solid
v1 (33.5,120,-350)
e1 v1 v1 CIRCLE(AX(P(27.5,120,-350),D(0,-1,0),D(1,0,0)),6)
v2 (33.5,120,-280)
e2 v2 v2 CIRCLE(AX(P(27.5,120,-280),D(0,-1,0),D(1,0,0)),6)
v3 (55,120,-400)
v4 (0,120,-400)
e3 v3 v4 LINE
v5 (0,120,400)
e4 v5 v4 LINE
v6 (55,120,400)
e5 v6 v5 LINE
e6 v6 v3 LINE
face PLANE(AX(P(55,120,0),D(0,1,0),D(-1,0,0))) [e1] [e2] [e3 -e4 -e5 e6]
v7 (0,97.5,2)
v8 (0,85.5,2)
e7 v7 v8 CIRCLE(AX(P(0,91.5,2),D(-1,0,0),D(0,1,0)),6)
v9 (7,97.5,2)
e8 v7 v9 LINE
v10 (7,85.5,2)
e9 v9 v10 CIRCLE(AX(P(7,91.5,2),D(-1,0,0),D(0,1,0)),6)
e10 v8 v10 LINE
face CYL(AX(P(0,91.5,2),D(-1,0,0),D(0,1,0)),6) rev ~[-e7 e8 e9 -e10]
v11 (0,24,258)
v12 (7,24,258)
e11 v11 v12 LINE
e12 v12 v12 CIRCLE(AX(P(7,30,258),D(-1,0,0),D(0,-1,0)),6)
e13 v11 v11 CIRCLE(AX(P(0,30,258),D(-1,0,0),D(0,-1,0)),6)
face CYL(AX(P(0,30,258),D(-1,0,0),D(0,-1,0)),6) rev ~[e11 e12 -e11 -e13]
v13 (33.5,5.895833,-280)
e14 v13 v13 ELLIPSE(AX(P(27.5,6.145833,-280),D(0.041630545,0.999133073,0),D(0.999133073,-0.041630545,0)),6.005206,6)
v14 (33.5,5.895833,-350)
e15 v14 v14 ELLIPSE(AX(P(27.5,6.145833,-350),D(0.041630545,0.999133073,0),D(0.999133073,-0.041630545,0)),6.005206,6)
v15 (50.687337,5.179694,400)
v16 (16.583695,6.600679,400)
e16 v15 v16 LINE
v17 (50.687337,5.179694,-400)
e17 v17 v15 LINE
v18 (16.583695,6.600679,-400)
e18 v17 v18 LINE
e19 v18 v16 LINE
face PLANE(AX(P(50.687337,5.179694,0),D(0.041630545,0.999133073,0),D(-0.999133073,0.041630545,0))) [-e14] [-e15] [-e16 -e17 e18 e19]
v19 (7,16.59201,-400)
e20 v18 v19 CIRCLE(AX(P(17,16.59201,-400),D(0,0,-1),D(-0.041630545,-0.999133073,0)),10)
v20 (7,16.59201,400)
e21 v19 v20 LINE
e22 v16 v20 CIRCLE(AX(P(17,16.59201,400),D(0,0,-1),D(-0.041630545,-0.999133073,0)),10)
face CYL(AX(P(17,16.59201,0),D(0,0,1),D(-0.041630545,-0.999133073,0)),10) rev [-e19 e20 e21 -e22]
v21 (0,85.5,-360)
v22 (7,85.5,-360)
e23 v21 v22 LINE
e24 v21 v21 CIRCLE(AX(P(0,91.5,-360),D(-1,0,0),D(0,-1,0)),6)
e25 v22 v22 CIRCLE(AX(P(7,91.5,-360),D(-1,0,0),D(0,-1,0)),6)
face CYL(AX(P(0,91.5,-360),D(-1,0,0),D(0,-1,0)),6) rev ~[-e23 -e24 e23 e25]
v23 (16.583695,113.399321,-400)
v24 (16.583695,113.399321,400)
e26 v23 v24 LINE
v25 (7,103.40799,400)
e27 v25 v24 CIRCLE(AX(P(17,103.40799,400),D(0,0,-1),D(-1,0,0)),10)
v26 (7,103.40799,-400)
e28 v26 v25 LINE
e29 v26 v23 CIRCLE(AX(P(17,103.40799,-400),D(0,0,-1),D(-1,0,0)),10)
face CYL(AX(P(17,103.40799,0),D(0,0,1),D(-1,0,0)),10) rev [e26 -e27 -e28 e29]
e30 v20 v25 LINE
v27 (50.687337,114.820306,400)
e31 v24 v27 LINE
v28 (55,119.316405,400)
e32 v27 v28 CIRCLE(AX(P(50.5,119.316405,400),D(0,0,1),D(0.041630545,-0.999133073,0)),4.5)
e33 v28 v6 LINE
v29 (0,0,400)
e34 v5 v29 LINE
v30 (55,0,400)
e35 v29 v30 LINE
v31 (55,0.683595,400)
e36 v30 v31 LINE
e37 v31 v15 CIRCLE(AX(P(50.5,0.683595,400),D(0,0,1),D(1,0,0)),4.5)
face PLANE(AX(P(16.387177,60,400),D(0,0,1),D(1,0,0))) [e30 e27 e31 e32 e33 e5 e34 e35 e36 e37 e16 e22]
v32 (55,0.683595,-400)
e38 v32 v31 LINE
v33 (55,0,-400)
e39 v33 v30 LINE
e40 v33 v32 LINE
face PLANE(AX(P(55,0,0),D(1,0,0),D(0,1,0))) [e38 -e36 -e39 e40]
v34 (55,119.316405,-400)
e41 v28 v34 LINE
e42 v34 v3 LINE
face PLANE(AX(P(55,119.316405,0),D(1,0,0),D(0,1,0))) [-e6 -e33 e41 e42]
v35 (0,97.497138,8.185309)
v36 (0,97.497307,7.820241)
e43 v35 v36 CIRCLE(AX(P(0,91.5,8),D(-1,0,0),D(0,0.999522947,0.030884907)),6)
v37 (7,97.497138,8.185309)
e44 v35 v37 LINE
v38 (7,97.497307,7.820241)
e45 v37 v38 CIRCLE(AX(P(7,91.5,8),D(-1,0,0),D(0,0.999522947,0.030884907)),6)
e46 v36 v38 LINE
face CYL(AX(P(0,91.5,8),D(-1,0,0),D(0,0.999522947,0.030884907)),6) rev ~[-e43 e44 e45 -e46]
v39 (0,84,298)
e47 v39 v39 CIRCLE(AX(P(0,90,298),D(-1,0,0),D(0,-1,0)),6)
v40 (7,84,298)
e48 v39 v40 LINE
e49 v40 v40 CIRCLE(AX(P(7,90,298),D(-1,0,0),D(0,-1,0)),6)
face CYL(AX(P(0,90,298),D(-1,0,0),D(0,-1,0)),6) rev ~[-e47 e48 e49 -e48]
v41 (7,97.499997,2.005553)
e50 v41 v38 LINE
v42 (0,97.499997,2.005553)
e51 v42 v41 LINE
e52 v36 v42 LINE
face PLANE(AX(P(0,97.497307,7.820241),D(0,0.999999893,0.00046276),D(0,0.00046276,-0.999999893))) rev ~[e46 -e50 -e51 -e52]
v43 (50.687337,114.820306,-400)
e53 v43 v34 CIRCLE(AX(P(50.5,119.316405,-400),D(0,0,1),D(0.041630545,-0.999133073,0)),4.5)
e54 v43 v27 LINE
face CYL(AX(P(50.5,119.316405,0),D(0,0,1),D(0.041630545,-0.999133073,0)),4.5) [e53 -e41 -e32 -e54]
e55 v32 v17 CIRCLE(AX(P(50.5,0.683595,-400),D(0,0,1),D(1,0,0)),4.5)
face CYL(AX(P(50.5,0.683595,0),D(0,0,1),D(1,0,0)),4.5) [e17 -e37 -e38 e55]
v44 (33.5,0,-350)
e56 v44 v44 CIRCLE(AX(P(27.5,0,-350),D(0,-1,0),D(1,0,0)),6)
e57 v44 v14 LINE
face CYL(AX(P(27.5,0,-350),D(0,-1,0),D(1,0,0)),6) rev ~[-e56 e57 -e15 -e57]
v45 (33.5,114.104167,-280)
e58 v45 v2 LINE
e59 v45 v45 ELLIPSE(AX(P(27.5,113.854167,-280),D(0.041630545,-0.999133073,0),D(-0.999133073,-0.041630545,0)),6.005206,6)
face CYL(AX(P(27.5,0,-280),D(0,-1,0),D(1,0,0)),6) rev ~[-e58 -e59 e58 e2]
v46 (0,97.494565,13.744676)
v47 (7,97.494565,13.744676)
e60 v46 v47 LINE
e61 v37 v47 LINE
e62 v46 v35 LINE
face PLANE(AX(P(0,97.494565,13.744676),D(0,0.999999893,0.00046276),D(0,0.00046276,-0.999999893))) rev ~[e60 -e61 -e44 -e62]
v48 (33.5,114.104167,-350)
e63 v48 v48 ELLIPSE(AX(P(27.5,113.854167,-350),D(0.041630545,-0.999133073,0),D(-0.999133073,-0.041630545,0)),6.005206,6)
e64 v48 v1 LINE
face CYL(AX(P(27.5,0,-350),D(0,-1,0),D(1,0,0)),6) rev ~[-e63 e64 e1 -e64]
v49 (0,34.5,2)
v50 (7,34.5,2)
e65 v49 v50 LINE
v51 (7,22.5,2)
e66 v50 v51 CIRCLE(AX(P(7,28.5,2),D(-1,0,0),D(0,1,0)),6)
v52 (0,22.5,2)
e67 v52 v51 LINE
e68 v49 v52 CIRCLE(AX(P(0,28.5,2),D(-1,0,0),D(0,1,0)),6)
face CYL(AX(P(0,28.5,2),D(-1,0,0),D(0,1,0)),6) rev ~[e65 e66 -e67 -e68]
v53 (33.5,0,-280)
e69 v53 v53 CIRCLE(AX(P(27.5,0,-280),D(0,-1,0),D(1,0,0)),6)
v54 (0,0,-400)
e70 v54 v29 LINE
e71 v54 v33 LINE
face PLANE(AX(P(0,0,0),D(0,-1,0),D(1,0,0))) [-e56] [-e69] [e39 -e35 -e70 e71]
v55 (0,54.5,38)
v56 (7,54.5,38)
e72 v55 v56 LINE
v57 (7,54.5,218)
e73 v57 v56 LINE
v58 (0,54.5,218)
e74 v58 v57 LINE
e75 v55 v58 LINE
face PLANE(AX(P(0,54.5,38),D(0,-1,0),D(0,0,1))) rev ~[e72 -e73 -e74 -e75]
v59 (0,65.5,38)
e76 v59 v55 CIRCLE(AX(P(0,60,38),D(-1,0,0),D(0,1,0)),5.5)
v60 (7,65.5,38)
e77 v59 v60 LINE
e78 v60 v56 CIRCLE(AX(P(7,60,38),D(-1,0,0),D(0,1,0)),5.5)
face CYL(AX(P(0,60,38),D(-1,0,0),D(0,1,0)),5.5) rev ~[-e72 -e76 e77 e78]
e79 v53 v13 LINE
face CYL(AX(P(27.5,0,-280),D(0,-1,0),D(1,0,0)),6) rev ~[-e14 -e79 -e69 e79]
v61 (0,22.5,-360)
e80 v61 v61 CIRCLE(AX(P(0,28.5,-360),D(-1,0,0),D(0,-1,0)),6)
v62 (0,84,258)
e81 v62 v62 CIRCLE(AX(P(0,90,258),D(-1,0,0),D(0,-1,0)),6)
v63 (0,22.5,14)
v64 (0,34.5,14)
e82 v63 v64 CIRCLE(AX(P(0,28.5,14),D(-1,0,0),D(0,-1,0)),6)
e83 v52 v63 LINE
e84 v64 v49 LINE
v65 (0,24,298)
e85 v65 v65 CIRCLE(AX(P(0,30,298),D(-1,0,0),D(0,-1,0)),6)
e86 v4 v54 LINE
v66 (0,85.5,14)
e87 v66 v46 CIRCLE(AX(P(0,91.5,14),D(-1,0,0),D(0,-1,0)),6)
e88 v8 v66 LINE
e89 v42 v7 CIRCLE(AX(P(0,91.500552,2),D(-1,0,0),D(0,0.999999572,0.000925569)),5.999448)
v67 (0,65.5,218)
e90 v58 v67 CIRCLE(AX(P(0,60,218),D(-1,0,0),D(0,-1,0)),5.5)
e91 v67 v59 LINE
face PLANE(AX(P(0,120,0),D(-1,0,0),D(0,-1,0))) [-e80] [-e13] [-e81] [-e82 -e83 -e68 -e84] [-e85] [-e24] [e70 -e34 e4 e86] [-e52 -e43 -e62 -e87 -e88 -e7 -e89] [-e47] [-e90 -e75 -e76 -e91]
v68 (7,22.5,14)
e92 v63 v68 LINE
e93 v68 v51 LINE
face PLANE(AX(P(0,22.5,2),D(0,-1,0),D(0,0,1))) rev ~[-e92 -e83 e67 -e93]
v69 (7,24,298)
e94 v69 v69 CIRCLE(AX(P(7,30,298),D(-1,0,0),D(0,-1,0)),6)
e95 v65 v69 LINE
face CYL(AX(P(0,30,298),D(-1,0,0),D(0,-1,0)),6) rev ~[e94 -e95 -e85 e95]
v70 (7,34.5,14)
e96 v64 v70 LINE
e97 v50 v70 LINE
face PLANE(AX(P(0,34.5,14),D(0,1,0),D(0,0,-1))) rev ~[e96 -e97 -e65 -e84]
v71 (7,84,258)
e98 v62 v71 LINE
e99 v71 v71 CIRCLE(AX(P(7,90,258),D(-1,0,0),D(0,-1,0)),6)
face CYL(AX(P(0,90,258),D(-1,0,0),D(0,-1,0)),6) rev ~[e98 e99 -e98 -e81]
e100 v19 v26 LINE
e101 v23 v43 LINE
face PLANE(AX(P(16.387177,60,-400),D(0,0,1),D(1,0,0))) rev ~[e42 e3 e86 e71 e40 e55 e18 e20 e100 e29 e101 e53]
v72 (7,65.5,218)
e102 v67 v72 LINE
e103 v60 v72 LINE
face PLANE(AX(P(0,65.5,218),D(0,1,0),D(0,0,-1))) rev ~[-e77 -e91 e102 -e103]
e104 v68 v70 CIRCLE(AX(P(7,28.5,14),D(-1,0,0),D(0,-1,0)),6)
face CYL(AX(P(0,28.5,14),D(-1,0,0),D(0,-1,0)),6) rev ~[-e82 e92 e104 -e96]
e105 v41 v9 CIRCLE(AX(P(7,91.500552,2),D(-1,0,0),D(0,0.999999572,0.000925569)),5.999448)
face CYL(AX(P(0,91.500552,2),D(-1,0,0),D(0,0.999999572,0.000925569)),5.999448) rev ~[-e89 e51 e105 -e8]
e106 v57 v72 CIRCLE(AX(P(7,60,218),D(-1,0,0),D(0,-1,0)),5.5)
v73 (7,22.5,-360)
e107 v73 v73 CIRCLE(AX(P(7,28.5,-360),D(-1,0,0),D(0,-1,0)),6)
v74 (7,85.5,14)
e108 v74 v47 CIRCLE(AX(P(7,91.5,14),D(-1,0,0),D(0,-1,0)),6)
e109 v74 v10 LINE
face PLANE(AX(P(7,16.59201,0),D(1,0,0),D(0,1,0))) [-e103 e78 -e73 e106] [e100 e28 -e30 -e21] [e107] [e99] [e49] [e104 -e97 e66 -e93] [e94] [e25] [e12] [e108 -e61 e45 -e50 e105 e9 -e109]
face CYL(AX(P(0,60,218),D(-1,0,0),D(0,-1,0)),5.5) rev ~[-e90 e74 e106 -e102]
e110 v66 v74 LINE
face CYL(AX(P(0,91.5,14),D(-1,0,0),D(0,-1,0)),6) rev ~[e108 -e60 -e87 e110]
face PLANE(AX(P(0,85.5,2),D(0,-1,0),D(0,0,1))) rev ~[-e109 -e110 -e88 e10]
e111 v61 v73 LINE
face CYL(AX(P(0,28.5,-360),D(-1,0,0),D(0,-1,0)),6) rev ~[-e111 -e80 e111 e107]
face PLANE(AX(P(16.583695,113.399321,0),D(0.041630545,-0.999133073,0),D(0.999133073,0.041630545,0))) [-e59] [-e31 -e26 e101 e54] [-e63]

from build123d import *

# Parameters (mm, degrees)
F1_DEPTH = 400
F2_R     = 6
F3_DEPTH = 55.001
F4_R     = 6
F5_DEPTH = 120.001


# Not quite as in the source:
# - a feature names something its author has since deleted; it is built from what else it names


with BuildPart() as f1:
    # F0 (on Top) → F1 (new body, symmetric)
    with BuildSketch(Plane.XY):
        with BuildLine():
            Line((0, 120), (0, 0))
            Line((0, 0), (55, 0))
            Line((55, 0), (55, 0.683595444))
            ThreePointArc((55, 0.683595444), (53.7475389551, 3.7986380977), (50.6873374512, 5.1796942729))
            Line((50.6873374512, 5.1796942729), (16.5836945529, 6.6006793936))
            ThreePointArc((16.5836945529, 6.6006793936), (9.7832467663, 9.6696931162), (7, 16.5920101246))
            Line((7, 16.5920101246), (7, 103.4079898754))
            ThreePointArc((7, 103.4079898754), (9.7832467663, 110.3303068838), (16.5836945529, 113.3993206064))
            Line((16.5836945529, 113.3993206064), (50.6873374512, 114.8203057271))
            ThreePointArc((50.6873374512, 114.8203057271), (53.7475389551, 116.2013619023), (55, 119.316404556))
            Line((55, 119.316404556), (55, 120))
            Line((55, 120), (0, 120))
        make_face()
    extrude(amount=F1_DEPTH, both=True)

    # F2 (on face) → F3 (cut, through all)
    with BuildSketch(Plane(origin=(0, 0, 0), x_dir=(0, -1, 0), z_dir=(-1, 0, 0))):
        with Locations((-90, 298)):
            Circle(F2_R)
        with Locations((-30, 298)):
            Circle(F2_R)
        with Locations((-30, 258)):
            Circle(F2_R)
        with Locations((-90, 258)):
            Circle(F2_R)
        with BuildLine():
            Line((-97.4973066239, 7.8202411081), (-97.4971376848, 8.1853094437))
            ThreePointArc((-97.4971376848, 8.1853094437), (-97.4999993576, 8.0027765611), (-97.4973066239, 7.8202411081))
        make_face()
        with Locations((-91.5, -360)):
            Circle(F2_R)
        with Locations((-28.5, -360)):
            Circle(F2_R)
        with BuildLine():
            Line((-97.4945650308, 13.7446764959), (-97.4971376848, 8.1853094437))
            Line((-97.4971376848, 8.1853094437), (-97.4973066239, 7.8202411081))
            Line((-97.4973066239, 7.8202411081), (-97.4999974302, 2.0055531216))
            ThreePointArc((-97.4999974302, 2.0055531216), (-97.4999993576, 2.0027765611), (-97.5, 2))
            ThreePointArc((-97.5, 2), (-91.5, -4), (-85.5, 2))
            Line((-85.5, 2), (-85.5, 14))
            ThreePointArc((-85.5, 14), (-91.6276906718, 19.9986411038), (-97.4945650308, 13.7446764959))
        make_face()
        with BuildLine():
            Line((-22.5, 2), (-22.5, 14))
            ThreePointArc((-22.5, 14), (-28.5, 20), (-34.5, 14))
            Line((-34.5, 14), (-34.5, 2))
            ThreePointArc((-34.5, 2), (-28.5, -4), (-22.5, 2))
        make_face()
        with BuildLine():
            Line((-65.5, 218), (-65.5, 38))
            ThreePointArc((-65.5, 38), (-60, 32.5), (-54.5, 38))
            Line((-54.5, 38), (-54.5, 218))
            ThreePointArc((-54.5, 218), (-60, 223.5), (-65.5, 218))
        make_face()
    extrude(amount=-F3_DEPTH, mode=Mode.SUBTRACT)

    # F4 (on face) → F5 (cut, through all)
    with BuildSketch(Plane.XZ):
        with Locations((27.5, -280)):
            Circle(F4_R)
        with Locations((27.5, -350)):
            Circle(F4_R)
    extrude(amount=-F5_DEPTH, mode=Mode.SUBTRACT)


solid = f1.part
